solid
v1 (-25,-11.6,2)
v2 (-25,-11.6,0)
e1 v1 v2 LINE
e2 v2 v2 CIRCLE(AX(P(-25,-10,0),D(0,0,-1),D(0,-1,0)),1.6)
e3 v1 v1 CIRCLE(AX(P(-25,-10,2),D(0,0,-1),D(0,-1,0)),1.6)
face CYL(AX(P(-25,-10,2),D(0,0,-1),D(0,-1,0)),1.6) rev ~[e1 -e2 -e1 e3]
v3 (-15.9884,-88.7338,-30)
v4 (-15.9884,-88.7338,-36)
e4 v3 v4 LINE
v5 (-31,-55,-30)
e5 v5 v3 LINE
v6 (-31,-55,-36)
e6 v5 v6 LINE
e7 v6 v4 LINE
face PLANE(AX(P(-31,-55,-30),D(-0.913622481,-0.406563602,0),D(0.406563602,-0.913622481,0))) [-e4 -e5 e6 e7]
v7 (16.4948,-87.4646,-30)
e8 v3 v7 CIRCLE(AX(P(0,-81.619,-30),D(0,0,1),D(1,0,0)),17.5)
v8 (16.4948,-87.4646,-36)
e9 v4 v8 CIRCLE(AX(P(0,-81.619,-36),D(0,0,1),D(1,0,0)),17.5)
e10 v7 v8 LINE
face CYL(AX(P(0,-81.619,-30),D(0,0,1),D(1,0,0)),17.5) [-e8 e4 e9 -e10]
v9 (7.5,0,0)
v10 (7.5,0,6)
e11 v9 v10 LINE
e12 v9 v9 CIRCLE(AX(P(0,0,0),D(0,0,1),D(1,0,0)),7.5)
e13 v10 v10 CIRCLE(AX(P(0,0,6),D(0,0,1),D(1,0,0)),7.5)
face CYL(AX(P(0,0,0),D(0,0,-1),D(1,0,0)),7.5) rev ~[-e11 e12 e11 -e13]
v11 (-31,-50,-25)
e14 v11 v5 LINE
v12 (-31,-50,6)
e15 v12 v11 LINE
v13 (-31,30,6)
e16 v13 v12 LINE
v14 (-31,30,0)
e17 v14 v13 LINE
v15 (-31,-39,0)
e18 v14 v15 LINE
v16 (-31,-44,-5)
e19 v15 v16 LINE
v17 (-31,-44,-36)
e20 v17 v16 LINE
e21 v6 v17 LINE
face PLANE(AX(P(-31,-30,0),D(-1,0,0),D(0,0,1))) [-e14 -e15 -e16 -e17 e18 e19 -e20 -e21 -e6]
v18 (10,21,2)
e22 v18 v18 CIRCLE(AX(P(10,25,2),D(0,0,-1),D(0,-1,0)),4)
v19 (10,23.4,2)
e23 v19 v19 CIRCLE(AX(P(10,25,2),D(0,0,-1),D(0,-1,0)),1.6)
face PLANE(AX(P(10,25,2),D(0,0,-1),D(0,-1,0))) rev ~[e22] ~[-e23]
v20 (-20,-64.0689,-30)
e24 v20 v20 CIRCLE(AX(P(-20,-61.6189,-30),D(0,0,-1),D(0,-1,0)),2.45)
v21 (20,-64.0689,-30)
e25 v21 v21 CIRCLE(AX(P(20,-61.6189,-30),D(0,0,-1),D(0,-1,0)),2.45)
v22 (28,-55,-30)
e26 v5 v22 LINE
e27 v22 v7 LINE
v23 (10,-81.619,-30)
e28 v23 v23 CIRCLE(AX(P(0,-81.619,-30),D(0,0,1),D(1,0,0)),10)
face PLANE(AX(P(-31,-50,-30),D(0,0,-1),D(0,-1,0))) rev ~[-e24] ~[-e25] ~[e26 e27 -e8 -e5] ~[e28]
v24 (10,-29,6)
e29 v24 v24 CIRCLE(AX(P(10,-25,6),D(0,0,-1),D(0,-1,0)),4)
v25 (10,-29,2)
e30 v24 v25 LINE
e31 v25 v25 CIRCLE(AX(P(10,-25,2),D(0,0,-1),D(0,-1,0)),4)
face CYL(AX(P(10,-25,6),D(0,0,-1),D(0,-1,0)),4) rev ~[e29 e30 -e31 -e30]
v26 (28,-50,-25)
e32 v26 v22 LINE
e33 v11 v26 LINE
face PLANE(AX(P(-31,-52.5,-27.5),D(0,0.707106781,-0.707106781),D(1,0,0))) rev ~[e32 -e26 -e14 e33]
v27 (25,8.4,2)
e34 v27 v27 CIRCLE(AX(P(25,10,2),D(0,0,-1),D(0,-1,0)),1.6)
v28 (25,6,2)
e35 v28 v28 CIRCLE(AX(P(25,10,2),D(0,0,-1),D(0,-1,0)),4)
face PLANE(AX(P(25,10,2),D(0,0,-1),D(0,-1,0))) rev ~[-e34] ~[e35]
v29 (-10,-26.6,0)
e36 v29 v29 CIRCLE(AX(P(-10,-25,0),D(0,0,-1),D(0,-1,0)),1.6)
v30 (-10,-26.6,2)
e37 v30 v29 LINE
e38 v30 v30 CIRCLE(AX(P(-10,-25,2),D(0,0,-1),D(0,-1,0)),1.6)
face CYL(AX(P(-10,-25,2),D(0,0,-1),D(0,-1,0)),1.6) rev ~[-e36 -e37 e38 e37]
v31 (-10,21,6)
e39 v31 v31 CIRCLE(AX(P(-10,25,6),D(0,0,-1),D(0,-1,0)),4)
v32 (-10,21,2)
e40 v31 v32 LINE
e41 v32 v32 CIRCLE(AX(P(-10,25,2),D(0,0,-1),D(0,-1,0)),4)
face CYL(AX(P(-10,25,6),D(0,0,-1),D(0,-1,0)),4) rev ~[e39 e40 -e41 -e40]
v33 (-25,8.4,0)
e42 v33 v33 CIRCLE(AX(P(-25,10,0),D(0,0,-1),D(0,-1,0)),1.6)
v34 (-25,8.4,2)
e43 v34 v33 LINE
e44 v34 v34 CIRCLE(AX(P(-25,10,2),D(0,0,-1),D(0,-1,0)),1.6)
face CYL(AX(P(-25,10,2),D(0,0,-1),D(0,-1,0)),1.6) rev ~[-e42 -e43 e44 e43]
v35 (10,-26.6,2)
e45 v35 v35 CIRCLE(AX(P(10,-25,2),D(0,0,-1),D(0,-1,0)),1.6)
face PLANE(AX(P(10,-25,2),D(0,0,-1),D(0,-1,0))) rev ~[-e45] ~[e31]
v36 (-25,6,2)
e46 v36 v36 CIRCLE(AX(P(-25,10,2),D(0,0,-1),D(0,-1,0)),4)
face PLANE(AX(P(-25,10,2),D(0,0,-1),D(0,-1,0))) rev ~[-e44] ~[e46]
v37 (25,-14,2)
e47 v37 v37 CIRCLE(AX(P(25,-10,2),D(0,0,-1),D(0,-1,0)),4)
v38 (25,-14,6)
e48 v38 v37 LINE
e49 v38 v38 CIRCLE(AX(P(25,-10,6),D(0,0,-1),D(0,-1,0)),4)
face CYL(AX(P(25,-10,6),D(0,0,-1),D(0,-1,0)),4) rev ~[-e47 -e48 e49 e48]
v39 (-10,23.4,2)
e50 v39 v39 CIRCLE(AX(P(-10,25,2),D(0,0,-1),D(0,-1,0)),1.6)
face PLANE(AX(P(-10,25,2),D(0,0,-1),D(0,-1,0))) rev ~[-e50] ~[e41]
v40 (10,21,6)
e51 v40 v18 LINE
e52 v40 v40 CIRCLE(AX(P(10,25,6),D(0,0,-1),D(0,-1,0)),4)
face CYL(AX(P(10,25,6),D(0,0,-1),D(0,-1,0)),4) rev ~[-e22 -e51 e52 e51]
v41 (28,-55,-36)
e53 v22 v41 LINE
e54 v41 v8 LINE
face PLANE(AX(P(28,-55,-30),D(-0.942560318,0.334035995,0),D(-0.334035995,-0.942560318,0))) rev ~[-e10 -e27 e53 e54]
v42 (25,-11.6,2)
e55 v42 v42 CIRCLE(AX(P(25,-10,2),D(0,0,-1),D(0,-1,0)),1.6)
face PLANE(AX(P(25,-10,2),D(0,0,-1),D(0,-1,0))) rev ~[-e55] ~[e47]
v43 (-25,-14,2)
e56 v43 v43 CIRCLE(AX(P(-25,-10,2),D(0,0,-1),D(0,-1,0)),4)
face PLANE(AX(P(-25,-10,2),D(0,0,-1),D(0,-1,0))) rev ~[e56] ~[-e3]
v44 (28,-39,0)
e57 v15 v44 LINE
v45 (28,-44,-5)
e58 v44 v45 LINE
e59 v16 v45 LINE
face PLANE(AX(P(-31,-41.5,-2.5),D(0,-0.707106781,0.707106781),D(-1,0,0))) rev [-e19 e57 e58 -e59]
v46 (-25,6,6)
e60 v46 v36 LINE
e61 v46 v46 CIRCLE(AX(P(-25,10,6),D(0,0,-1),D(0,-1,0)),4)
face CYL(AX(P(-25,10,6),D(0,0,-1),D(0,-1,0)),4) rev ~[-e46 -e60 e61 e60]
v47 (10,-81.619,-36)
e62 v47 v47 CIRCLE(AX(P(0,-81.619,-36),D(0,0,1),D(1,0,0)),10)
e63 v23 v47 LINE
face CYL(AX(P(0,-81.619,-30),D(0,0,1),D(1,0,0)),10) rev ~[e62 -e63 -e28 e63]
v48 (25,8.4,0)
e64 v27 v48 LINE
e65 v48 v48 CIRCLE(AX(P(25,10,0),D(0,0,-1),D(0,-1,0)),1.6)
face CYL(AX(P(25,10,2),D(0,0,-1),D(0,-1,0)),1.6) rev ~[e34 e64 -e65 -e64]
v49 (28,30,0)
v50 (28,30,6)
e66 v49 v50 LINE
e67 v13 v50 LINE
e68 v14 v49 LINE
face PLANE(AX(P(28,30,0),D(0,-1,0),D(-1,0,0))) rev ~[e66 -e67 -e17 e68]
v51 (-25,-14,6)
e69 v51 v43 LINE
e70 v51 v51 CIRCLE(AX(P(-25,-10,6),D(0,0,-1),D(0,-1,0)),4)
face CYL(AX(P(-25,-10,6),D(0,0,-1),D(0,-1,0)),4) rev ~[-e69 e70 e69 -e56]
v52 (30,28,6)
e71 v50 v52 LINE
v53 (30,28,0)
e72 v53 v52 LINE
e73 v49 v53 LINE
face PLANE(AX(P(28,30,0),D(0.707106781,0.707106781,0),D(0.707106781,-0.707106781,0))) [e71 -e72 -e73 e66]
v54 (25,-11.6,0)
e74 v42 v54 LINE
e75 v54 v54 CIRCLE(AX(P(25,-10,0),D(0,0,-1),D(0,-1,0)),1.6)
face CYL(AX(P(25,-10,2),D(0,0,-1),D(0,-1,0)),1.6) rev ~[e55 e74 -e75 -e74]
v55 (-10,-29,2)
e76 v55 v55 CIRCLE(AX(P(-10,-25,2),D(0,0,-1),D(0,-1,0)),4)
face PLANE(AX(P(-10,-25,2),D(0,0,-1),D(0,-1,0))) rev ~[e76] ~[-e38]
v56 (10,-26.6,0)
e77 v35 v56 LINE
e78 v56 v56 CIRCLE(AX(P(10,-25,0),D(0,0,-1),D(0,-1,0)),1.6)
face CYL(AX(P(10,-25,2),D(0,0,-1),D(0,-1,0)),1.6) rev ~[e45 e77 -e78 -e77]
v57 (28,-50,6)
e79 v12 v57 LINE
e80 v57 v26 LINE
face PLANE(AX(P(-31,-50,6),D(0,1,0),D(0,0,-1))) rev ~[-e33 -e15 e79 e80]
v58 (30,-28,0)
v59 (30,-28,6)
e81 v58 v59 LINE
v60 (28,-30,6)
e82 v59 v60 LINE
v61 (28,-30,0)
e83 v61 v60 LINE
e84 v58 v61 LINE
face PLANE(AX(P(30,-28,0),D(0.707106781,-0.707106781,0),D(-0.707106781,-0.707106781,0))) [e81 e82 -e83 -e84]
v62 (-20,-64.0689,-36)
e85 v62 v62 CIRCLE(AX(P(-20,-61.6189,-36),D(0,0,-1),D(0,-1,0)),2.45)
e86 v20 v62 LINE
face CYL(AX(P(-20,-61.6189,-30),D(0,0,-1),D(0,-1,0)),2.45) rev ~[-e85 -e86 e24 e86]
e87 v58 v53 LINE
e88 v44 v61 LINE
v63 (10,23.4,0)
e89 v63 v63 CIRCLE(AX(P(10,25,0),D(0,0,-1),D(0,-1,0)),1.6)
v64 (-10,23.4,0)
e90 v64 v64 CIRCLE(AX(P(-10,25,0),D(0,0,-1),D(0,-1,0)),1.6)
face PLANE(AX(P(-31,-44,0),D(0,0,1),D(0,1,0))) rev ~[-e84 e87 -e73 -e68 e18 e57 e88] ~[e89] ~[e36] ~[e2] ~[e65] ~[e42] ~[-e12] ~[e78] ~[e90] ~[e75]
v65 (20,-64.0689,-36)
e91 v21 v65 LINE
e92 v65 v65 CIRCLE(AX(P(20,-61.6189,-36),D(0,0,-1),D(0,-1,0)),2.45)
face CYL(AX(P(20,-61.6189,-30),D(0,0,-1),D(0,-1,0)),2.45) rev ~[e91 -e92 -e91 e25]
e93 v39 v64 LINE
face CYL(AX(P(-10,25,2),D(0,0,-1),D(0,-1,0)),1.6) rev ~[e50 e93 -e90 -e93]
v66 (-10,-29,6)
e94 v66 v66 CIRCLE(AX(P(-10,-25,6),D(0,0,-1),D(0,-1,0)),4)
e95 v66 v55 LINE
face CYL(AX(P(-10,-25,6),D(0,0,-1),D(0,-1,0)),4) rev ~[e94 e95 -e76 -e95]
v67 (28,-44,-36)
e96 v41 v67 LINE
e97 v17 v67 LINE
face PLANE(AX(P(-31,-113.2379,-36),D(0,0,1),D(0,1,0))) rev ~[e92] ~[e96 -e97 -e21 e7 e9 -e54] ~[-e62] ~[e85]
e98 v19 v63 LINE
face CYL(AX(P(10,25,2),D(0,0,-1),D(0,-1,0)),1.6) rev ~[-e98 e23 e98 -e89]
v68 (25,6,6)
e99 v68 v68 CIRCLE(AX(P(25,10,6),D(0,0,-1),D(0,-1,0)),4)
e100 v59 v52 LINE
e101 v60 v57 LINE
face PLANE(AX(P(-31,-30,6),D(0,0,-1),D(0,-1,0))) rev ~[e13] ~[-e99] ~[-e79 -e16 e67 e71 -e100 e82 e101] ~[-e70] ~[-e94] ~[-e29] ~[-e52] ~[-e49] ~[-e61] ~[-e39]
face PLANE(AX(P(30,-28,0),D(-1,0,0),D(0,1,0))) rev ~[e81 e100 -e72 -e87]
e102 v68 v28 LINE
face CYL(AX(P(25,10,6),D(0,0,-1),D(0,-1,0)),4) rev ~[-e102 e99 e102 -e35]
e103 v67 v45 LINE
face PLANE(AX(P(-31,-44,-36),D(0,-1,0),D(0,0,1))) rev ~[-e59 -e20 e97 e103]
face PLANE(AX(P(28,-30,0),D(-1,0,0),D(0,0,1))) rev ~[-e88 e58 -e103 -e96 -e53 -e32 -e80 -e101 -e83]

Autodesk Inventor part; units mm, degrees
ref_plane "YZ Plane" through (0, 0, 0) normal (1, 0, 0) x (0, 1, 0)
ref_plane "XZ Plane" through (0, 0, 0) normal (0, 1, 0) x (-1, 0, 0)
ref_plane "XY Plane" through (0, 0, 0) normal (0, 0, 1) x (1, 0, 0)
ref_plane "Work Plane1" through (0, 0, 0) normal (0, 0, 1) x (1, 0, 0)
sketch "Sketch1" plane through (0, 0, 0) normal (0, 0, 1) x (1, 0, 0)
  circle A0 centre (-10, -25) radius 1.45 projected
  circle A1 centre (-10, 25) radius 1.45 projected
  circle A2 centre (10, 25) radius 1.45 projected
  circle A3 centre (10, -25) radius 1.45 projected
  circle A4 centre (-25, 25) radius 2.325 projected
  circle A5 centre (25, -25) radius 2.325 projected
  circle A6 centre (-25, -25) radius 2.325 projected
  circle A7 centre (25, 25) radius 2.325 projected
  line L0 (28, 30) -> (30, 28) projected
  line L1 (28, 30) -> (-28, 30) projected
  line L2 (-30, 28) -> (-28, 30) projected
  line L3 (-30, 28) -> (-30, -28) projected
  line L4 (-28, -30) -> (-30, -28) projected
  line L5 (-28, -30) -> (28, -30) projected
  line L6 (30, -28) -> (28, -30) projected
  line L7 (30, -28) -> (30, 28) projected
  circle A8 centre (-17.5, -17.5) radius 1.95 projected
  circle A9 centre (17.5, 17.5) radius 1.95 projected
  circle A10 centre (17.5, -17.5) radius 1.95 projected
  circle A11 centre (-17.5, 17.5) radius 1.95 projected
  circle A12 centre (0, 0) radius 7.5 projected
  circle A13 centre (-25.33, -75.26) radius 6.15 projected
  circle A14 centre (25, -10) radius 1.45 projected
  circle A15 centre (-25, -10) radius 1.45 projected
  circle A16 centre (-25, 10) radius 1.45 projected
  circle A17 centre (25, 10) radius 1.45 projected
  line L8 (-28, -30) -> (-31, -30)
  line L9 (-31, -30) -> (-31, 30)
  line L10 (-31, 30) -> (-28, 30)
  line L11 (-28, 30) -> (-28, -30)
  point P0 (0, 0)
  dimension "d0" = 3
extrude "Extrusion1" add sketch "Sketch1" along normal blind 6 contours A4 | A5 | A6 | A7 | L0 L7 L6 L5 L11 L1 | L11 L4 L3 L2 | L2 L3 L4 L8 L9 L10 | A8 | A9 | A10 | A11
ref_plane "Work Plane3" through (0, 0, 19) normal (0, 0, 1) x (1, 0, 0)
sketch "Sketch7" plane through (0, 0, 6) normal (0, 0, 1) x (1, 0, 0)
  circle A0 centre (10, -25) radius 1.45 projected
  circle A1 centre (-10, -25) radius 1.45 projected
  circle A2 centre (-25, -10) radius 1.45 projected
  circle A3 centre (-25, 10) radius 1.45 projected
  circle A4 centre (-10, 25) radius 1.45 projected
  circle A5 centre (10, 25) radius 1.45 projected
  circle A6 centre (25, 10) radius 1.45 projected
  circle A7 centre (25, -10) radius 1.45 projected
  point P0 (0, 0)
hole "Hole1" at (-25, -10, 6) at (-25, 10, 6) at (-10, 25, 6) at (10, 25, 6) at (25, 10, 6) at (25, -10, 6) at (10, -25, 6) at (-10, -25, 6) direction (0, 0, -1) diameter 3.2 end through all counterbore diameter 8 counterbore depth 4
sketch "Sketch10" plane through (-31, -30, 0) normal (-1, 0, 0) x (0, 0, 1)
  line L0 (2, 16) -> (2, 24) projected
  line L1 (0, 0) -> (0, 60) projected
  line L2 (0, 0) -> (6, 0) projected
  line L3 (6, 60) -> (6, 0) projected
  line L4 (0, 60) -> (6, 60) projected
  line L5 (6, 0) -> (6, -20)
  line L6 (6, -20) -> (-30, -20)
  line L7 (-30, -20) -> (-30, -83.2379)
  line L8 (-30, -83.2379) -> (-36, -83.2379)
  line L9 (-36, -83.2379) -> (-36, -14)
  line L10 (-36, -14) -> (0, -14)
  line L11 (0, -14) -> (0, 0)
  line L12 (6, 60) -> (6, 0) projected
  line L13 (0, 0) -> (6, 0)
  point P0 (0, 30)
  dimension "d55" = 20
  dimension "d56" = 90
  dimension "d57" = 6
  dimension "d58" = 90
  dimension "d59" = 90
  dimension "d60" = 90
  dimension "d61" = 30
  dimension "d71" = 6
extrude "Extrusion9" add sketch "Sketch10" against normal up to surface (59 mm away) contours L2 L5 L6 L7 L8 L9 L10 L11
sketch "Sketch11" plane through (-31, -113.2379, -30) normal (0, 0, 1) x (1, 0, 0)
  line L0 (59, 63.2379) -> (59, 0) projected
  line L1 (0, 63.2379) -> (59, 63.2379) projected
  line L2 (0, 0) -> (0, 63.2379) projected
  line L3 (0, 0) -> (59, 0) projected
  circle A0 centre (31, 31.6189) radius 10
  point P0 (31, 113.2379)
  dimension "d65" = 20
extrude "Extrusion10" cut sketch "Sketch11" against normal blind 10 contours A0
chamfer "Chamfer3" distance 5 angle 45 2 edges at (-1.5, -50, -30) (-1.5, -44, 0)
sketch "Sketch12" plane through (-31, -113.2379, -30) normal (0, 0, 1) x (1, 0, 0)
  line L0 (0, 58.2379) -> (59, 58.2379) projected
  line L1 (0, 0) -> (0, 58.2379) projected
  line L2 (0, 0) -> (59, 0) projected
  line L3 (59, 58.2379) -> (59, 0) projected
  circle A0 centre (31, 31.6189) radius 10 projected
  line L4 (51, 51.6189) -> (11, 51.6189)
  line L5 (11, 51.6189) -> (11, 11.6189)
  line L6 (11, 11.6189) -> (51, 11.6189)
  line L7 (51, 11.6189) -> (51, 51.6189)
  line L8 (51, 51.6189) -> (11, 11.6189) construction
  line L9 (11, 51.6189) -> (51, 11.6189) construction
  point P0 (31, 113.2379)
  dimension "d72" = 40
  dimension "d73" = 40
hole "Hole2" at (-20, -101.6189, -30) at (-20, -61.6189, -30) at (20, -61.6189, -30) at (20, -101.6189, -30) direction (0, 0, -1) diameter 4.9 end through all
sketch "Sketch13" plane through (-31, -113.2379, -30) normal (0, 0, 1) x (1, 0, 0)
  circle A0 centre (51, 51.6189) radius 2.45 projected
  circle A1 centre (11, 11.6189) radius 2.45 projected
  circle A2 centre (11, 51.6189) radius 2.45 projected
  circle A3 centre (51, 11.6189) radius 2.45 projected
  line L0 (0, 58.2379) -> (59, 58.2379) projected
  line L1 (0, 0) -> (0, 58.2379) projected
  line L2 (0, 0) -> (59, 0) projected
  line L3 (59, 58.2379) -> (59, 0) projected
  circle A4 centre (31, 31.6189) radius 10 projected
  circle A5 centre (31, 31.6189) radius 17.5
  line L4 (0, 58.2379) -> (15.0116, 24.5041)
  line L5 (0, 58.2379) -> (59, 58.2379) projected
  line L6 (59, 58.2379) -> (47.4948, 25.7733)
  point P0 (31, 113.2379)
  dimension "d81" = 35
extrude "Extrusion11" cut sketch "Sketch13" against normal through all contours L4 A5 L6 L3 L2 L1
equation "\"d57\" = d1"
equation "\"d71\" = d1"
equation "\"d1\" = 6"
properties part number "cellSTORM_UC2_Sample_arm_ptycho"
